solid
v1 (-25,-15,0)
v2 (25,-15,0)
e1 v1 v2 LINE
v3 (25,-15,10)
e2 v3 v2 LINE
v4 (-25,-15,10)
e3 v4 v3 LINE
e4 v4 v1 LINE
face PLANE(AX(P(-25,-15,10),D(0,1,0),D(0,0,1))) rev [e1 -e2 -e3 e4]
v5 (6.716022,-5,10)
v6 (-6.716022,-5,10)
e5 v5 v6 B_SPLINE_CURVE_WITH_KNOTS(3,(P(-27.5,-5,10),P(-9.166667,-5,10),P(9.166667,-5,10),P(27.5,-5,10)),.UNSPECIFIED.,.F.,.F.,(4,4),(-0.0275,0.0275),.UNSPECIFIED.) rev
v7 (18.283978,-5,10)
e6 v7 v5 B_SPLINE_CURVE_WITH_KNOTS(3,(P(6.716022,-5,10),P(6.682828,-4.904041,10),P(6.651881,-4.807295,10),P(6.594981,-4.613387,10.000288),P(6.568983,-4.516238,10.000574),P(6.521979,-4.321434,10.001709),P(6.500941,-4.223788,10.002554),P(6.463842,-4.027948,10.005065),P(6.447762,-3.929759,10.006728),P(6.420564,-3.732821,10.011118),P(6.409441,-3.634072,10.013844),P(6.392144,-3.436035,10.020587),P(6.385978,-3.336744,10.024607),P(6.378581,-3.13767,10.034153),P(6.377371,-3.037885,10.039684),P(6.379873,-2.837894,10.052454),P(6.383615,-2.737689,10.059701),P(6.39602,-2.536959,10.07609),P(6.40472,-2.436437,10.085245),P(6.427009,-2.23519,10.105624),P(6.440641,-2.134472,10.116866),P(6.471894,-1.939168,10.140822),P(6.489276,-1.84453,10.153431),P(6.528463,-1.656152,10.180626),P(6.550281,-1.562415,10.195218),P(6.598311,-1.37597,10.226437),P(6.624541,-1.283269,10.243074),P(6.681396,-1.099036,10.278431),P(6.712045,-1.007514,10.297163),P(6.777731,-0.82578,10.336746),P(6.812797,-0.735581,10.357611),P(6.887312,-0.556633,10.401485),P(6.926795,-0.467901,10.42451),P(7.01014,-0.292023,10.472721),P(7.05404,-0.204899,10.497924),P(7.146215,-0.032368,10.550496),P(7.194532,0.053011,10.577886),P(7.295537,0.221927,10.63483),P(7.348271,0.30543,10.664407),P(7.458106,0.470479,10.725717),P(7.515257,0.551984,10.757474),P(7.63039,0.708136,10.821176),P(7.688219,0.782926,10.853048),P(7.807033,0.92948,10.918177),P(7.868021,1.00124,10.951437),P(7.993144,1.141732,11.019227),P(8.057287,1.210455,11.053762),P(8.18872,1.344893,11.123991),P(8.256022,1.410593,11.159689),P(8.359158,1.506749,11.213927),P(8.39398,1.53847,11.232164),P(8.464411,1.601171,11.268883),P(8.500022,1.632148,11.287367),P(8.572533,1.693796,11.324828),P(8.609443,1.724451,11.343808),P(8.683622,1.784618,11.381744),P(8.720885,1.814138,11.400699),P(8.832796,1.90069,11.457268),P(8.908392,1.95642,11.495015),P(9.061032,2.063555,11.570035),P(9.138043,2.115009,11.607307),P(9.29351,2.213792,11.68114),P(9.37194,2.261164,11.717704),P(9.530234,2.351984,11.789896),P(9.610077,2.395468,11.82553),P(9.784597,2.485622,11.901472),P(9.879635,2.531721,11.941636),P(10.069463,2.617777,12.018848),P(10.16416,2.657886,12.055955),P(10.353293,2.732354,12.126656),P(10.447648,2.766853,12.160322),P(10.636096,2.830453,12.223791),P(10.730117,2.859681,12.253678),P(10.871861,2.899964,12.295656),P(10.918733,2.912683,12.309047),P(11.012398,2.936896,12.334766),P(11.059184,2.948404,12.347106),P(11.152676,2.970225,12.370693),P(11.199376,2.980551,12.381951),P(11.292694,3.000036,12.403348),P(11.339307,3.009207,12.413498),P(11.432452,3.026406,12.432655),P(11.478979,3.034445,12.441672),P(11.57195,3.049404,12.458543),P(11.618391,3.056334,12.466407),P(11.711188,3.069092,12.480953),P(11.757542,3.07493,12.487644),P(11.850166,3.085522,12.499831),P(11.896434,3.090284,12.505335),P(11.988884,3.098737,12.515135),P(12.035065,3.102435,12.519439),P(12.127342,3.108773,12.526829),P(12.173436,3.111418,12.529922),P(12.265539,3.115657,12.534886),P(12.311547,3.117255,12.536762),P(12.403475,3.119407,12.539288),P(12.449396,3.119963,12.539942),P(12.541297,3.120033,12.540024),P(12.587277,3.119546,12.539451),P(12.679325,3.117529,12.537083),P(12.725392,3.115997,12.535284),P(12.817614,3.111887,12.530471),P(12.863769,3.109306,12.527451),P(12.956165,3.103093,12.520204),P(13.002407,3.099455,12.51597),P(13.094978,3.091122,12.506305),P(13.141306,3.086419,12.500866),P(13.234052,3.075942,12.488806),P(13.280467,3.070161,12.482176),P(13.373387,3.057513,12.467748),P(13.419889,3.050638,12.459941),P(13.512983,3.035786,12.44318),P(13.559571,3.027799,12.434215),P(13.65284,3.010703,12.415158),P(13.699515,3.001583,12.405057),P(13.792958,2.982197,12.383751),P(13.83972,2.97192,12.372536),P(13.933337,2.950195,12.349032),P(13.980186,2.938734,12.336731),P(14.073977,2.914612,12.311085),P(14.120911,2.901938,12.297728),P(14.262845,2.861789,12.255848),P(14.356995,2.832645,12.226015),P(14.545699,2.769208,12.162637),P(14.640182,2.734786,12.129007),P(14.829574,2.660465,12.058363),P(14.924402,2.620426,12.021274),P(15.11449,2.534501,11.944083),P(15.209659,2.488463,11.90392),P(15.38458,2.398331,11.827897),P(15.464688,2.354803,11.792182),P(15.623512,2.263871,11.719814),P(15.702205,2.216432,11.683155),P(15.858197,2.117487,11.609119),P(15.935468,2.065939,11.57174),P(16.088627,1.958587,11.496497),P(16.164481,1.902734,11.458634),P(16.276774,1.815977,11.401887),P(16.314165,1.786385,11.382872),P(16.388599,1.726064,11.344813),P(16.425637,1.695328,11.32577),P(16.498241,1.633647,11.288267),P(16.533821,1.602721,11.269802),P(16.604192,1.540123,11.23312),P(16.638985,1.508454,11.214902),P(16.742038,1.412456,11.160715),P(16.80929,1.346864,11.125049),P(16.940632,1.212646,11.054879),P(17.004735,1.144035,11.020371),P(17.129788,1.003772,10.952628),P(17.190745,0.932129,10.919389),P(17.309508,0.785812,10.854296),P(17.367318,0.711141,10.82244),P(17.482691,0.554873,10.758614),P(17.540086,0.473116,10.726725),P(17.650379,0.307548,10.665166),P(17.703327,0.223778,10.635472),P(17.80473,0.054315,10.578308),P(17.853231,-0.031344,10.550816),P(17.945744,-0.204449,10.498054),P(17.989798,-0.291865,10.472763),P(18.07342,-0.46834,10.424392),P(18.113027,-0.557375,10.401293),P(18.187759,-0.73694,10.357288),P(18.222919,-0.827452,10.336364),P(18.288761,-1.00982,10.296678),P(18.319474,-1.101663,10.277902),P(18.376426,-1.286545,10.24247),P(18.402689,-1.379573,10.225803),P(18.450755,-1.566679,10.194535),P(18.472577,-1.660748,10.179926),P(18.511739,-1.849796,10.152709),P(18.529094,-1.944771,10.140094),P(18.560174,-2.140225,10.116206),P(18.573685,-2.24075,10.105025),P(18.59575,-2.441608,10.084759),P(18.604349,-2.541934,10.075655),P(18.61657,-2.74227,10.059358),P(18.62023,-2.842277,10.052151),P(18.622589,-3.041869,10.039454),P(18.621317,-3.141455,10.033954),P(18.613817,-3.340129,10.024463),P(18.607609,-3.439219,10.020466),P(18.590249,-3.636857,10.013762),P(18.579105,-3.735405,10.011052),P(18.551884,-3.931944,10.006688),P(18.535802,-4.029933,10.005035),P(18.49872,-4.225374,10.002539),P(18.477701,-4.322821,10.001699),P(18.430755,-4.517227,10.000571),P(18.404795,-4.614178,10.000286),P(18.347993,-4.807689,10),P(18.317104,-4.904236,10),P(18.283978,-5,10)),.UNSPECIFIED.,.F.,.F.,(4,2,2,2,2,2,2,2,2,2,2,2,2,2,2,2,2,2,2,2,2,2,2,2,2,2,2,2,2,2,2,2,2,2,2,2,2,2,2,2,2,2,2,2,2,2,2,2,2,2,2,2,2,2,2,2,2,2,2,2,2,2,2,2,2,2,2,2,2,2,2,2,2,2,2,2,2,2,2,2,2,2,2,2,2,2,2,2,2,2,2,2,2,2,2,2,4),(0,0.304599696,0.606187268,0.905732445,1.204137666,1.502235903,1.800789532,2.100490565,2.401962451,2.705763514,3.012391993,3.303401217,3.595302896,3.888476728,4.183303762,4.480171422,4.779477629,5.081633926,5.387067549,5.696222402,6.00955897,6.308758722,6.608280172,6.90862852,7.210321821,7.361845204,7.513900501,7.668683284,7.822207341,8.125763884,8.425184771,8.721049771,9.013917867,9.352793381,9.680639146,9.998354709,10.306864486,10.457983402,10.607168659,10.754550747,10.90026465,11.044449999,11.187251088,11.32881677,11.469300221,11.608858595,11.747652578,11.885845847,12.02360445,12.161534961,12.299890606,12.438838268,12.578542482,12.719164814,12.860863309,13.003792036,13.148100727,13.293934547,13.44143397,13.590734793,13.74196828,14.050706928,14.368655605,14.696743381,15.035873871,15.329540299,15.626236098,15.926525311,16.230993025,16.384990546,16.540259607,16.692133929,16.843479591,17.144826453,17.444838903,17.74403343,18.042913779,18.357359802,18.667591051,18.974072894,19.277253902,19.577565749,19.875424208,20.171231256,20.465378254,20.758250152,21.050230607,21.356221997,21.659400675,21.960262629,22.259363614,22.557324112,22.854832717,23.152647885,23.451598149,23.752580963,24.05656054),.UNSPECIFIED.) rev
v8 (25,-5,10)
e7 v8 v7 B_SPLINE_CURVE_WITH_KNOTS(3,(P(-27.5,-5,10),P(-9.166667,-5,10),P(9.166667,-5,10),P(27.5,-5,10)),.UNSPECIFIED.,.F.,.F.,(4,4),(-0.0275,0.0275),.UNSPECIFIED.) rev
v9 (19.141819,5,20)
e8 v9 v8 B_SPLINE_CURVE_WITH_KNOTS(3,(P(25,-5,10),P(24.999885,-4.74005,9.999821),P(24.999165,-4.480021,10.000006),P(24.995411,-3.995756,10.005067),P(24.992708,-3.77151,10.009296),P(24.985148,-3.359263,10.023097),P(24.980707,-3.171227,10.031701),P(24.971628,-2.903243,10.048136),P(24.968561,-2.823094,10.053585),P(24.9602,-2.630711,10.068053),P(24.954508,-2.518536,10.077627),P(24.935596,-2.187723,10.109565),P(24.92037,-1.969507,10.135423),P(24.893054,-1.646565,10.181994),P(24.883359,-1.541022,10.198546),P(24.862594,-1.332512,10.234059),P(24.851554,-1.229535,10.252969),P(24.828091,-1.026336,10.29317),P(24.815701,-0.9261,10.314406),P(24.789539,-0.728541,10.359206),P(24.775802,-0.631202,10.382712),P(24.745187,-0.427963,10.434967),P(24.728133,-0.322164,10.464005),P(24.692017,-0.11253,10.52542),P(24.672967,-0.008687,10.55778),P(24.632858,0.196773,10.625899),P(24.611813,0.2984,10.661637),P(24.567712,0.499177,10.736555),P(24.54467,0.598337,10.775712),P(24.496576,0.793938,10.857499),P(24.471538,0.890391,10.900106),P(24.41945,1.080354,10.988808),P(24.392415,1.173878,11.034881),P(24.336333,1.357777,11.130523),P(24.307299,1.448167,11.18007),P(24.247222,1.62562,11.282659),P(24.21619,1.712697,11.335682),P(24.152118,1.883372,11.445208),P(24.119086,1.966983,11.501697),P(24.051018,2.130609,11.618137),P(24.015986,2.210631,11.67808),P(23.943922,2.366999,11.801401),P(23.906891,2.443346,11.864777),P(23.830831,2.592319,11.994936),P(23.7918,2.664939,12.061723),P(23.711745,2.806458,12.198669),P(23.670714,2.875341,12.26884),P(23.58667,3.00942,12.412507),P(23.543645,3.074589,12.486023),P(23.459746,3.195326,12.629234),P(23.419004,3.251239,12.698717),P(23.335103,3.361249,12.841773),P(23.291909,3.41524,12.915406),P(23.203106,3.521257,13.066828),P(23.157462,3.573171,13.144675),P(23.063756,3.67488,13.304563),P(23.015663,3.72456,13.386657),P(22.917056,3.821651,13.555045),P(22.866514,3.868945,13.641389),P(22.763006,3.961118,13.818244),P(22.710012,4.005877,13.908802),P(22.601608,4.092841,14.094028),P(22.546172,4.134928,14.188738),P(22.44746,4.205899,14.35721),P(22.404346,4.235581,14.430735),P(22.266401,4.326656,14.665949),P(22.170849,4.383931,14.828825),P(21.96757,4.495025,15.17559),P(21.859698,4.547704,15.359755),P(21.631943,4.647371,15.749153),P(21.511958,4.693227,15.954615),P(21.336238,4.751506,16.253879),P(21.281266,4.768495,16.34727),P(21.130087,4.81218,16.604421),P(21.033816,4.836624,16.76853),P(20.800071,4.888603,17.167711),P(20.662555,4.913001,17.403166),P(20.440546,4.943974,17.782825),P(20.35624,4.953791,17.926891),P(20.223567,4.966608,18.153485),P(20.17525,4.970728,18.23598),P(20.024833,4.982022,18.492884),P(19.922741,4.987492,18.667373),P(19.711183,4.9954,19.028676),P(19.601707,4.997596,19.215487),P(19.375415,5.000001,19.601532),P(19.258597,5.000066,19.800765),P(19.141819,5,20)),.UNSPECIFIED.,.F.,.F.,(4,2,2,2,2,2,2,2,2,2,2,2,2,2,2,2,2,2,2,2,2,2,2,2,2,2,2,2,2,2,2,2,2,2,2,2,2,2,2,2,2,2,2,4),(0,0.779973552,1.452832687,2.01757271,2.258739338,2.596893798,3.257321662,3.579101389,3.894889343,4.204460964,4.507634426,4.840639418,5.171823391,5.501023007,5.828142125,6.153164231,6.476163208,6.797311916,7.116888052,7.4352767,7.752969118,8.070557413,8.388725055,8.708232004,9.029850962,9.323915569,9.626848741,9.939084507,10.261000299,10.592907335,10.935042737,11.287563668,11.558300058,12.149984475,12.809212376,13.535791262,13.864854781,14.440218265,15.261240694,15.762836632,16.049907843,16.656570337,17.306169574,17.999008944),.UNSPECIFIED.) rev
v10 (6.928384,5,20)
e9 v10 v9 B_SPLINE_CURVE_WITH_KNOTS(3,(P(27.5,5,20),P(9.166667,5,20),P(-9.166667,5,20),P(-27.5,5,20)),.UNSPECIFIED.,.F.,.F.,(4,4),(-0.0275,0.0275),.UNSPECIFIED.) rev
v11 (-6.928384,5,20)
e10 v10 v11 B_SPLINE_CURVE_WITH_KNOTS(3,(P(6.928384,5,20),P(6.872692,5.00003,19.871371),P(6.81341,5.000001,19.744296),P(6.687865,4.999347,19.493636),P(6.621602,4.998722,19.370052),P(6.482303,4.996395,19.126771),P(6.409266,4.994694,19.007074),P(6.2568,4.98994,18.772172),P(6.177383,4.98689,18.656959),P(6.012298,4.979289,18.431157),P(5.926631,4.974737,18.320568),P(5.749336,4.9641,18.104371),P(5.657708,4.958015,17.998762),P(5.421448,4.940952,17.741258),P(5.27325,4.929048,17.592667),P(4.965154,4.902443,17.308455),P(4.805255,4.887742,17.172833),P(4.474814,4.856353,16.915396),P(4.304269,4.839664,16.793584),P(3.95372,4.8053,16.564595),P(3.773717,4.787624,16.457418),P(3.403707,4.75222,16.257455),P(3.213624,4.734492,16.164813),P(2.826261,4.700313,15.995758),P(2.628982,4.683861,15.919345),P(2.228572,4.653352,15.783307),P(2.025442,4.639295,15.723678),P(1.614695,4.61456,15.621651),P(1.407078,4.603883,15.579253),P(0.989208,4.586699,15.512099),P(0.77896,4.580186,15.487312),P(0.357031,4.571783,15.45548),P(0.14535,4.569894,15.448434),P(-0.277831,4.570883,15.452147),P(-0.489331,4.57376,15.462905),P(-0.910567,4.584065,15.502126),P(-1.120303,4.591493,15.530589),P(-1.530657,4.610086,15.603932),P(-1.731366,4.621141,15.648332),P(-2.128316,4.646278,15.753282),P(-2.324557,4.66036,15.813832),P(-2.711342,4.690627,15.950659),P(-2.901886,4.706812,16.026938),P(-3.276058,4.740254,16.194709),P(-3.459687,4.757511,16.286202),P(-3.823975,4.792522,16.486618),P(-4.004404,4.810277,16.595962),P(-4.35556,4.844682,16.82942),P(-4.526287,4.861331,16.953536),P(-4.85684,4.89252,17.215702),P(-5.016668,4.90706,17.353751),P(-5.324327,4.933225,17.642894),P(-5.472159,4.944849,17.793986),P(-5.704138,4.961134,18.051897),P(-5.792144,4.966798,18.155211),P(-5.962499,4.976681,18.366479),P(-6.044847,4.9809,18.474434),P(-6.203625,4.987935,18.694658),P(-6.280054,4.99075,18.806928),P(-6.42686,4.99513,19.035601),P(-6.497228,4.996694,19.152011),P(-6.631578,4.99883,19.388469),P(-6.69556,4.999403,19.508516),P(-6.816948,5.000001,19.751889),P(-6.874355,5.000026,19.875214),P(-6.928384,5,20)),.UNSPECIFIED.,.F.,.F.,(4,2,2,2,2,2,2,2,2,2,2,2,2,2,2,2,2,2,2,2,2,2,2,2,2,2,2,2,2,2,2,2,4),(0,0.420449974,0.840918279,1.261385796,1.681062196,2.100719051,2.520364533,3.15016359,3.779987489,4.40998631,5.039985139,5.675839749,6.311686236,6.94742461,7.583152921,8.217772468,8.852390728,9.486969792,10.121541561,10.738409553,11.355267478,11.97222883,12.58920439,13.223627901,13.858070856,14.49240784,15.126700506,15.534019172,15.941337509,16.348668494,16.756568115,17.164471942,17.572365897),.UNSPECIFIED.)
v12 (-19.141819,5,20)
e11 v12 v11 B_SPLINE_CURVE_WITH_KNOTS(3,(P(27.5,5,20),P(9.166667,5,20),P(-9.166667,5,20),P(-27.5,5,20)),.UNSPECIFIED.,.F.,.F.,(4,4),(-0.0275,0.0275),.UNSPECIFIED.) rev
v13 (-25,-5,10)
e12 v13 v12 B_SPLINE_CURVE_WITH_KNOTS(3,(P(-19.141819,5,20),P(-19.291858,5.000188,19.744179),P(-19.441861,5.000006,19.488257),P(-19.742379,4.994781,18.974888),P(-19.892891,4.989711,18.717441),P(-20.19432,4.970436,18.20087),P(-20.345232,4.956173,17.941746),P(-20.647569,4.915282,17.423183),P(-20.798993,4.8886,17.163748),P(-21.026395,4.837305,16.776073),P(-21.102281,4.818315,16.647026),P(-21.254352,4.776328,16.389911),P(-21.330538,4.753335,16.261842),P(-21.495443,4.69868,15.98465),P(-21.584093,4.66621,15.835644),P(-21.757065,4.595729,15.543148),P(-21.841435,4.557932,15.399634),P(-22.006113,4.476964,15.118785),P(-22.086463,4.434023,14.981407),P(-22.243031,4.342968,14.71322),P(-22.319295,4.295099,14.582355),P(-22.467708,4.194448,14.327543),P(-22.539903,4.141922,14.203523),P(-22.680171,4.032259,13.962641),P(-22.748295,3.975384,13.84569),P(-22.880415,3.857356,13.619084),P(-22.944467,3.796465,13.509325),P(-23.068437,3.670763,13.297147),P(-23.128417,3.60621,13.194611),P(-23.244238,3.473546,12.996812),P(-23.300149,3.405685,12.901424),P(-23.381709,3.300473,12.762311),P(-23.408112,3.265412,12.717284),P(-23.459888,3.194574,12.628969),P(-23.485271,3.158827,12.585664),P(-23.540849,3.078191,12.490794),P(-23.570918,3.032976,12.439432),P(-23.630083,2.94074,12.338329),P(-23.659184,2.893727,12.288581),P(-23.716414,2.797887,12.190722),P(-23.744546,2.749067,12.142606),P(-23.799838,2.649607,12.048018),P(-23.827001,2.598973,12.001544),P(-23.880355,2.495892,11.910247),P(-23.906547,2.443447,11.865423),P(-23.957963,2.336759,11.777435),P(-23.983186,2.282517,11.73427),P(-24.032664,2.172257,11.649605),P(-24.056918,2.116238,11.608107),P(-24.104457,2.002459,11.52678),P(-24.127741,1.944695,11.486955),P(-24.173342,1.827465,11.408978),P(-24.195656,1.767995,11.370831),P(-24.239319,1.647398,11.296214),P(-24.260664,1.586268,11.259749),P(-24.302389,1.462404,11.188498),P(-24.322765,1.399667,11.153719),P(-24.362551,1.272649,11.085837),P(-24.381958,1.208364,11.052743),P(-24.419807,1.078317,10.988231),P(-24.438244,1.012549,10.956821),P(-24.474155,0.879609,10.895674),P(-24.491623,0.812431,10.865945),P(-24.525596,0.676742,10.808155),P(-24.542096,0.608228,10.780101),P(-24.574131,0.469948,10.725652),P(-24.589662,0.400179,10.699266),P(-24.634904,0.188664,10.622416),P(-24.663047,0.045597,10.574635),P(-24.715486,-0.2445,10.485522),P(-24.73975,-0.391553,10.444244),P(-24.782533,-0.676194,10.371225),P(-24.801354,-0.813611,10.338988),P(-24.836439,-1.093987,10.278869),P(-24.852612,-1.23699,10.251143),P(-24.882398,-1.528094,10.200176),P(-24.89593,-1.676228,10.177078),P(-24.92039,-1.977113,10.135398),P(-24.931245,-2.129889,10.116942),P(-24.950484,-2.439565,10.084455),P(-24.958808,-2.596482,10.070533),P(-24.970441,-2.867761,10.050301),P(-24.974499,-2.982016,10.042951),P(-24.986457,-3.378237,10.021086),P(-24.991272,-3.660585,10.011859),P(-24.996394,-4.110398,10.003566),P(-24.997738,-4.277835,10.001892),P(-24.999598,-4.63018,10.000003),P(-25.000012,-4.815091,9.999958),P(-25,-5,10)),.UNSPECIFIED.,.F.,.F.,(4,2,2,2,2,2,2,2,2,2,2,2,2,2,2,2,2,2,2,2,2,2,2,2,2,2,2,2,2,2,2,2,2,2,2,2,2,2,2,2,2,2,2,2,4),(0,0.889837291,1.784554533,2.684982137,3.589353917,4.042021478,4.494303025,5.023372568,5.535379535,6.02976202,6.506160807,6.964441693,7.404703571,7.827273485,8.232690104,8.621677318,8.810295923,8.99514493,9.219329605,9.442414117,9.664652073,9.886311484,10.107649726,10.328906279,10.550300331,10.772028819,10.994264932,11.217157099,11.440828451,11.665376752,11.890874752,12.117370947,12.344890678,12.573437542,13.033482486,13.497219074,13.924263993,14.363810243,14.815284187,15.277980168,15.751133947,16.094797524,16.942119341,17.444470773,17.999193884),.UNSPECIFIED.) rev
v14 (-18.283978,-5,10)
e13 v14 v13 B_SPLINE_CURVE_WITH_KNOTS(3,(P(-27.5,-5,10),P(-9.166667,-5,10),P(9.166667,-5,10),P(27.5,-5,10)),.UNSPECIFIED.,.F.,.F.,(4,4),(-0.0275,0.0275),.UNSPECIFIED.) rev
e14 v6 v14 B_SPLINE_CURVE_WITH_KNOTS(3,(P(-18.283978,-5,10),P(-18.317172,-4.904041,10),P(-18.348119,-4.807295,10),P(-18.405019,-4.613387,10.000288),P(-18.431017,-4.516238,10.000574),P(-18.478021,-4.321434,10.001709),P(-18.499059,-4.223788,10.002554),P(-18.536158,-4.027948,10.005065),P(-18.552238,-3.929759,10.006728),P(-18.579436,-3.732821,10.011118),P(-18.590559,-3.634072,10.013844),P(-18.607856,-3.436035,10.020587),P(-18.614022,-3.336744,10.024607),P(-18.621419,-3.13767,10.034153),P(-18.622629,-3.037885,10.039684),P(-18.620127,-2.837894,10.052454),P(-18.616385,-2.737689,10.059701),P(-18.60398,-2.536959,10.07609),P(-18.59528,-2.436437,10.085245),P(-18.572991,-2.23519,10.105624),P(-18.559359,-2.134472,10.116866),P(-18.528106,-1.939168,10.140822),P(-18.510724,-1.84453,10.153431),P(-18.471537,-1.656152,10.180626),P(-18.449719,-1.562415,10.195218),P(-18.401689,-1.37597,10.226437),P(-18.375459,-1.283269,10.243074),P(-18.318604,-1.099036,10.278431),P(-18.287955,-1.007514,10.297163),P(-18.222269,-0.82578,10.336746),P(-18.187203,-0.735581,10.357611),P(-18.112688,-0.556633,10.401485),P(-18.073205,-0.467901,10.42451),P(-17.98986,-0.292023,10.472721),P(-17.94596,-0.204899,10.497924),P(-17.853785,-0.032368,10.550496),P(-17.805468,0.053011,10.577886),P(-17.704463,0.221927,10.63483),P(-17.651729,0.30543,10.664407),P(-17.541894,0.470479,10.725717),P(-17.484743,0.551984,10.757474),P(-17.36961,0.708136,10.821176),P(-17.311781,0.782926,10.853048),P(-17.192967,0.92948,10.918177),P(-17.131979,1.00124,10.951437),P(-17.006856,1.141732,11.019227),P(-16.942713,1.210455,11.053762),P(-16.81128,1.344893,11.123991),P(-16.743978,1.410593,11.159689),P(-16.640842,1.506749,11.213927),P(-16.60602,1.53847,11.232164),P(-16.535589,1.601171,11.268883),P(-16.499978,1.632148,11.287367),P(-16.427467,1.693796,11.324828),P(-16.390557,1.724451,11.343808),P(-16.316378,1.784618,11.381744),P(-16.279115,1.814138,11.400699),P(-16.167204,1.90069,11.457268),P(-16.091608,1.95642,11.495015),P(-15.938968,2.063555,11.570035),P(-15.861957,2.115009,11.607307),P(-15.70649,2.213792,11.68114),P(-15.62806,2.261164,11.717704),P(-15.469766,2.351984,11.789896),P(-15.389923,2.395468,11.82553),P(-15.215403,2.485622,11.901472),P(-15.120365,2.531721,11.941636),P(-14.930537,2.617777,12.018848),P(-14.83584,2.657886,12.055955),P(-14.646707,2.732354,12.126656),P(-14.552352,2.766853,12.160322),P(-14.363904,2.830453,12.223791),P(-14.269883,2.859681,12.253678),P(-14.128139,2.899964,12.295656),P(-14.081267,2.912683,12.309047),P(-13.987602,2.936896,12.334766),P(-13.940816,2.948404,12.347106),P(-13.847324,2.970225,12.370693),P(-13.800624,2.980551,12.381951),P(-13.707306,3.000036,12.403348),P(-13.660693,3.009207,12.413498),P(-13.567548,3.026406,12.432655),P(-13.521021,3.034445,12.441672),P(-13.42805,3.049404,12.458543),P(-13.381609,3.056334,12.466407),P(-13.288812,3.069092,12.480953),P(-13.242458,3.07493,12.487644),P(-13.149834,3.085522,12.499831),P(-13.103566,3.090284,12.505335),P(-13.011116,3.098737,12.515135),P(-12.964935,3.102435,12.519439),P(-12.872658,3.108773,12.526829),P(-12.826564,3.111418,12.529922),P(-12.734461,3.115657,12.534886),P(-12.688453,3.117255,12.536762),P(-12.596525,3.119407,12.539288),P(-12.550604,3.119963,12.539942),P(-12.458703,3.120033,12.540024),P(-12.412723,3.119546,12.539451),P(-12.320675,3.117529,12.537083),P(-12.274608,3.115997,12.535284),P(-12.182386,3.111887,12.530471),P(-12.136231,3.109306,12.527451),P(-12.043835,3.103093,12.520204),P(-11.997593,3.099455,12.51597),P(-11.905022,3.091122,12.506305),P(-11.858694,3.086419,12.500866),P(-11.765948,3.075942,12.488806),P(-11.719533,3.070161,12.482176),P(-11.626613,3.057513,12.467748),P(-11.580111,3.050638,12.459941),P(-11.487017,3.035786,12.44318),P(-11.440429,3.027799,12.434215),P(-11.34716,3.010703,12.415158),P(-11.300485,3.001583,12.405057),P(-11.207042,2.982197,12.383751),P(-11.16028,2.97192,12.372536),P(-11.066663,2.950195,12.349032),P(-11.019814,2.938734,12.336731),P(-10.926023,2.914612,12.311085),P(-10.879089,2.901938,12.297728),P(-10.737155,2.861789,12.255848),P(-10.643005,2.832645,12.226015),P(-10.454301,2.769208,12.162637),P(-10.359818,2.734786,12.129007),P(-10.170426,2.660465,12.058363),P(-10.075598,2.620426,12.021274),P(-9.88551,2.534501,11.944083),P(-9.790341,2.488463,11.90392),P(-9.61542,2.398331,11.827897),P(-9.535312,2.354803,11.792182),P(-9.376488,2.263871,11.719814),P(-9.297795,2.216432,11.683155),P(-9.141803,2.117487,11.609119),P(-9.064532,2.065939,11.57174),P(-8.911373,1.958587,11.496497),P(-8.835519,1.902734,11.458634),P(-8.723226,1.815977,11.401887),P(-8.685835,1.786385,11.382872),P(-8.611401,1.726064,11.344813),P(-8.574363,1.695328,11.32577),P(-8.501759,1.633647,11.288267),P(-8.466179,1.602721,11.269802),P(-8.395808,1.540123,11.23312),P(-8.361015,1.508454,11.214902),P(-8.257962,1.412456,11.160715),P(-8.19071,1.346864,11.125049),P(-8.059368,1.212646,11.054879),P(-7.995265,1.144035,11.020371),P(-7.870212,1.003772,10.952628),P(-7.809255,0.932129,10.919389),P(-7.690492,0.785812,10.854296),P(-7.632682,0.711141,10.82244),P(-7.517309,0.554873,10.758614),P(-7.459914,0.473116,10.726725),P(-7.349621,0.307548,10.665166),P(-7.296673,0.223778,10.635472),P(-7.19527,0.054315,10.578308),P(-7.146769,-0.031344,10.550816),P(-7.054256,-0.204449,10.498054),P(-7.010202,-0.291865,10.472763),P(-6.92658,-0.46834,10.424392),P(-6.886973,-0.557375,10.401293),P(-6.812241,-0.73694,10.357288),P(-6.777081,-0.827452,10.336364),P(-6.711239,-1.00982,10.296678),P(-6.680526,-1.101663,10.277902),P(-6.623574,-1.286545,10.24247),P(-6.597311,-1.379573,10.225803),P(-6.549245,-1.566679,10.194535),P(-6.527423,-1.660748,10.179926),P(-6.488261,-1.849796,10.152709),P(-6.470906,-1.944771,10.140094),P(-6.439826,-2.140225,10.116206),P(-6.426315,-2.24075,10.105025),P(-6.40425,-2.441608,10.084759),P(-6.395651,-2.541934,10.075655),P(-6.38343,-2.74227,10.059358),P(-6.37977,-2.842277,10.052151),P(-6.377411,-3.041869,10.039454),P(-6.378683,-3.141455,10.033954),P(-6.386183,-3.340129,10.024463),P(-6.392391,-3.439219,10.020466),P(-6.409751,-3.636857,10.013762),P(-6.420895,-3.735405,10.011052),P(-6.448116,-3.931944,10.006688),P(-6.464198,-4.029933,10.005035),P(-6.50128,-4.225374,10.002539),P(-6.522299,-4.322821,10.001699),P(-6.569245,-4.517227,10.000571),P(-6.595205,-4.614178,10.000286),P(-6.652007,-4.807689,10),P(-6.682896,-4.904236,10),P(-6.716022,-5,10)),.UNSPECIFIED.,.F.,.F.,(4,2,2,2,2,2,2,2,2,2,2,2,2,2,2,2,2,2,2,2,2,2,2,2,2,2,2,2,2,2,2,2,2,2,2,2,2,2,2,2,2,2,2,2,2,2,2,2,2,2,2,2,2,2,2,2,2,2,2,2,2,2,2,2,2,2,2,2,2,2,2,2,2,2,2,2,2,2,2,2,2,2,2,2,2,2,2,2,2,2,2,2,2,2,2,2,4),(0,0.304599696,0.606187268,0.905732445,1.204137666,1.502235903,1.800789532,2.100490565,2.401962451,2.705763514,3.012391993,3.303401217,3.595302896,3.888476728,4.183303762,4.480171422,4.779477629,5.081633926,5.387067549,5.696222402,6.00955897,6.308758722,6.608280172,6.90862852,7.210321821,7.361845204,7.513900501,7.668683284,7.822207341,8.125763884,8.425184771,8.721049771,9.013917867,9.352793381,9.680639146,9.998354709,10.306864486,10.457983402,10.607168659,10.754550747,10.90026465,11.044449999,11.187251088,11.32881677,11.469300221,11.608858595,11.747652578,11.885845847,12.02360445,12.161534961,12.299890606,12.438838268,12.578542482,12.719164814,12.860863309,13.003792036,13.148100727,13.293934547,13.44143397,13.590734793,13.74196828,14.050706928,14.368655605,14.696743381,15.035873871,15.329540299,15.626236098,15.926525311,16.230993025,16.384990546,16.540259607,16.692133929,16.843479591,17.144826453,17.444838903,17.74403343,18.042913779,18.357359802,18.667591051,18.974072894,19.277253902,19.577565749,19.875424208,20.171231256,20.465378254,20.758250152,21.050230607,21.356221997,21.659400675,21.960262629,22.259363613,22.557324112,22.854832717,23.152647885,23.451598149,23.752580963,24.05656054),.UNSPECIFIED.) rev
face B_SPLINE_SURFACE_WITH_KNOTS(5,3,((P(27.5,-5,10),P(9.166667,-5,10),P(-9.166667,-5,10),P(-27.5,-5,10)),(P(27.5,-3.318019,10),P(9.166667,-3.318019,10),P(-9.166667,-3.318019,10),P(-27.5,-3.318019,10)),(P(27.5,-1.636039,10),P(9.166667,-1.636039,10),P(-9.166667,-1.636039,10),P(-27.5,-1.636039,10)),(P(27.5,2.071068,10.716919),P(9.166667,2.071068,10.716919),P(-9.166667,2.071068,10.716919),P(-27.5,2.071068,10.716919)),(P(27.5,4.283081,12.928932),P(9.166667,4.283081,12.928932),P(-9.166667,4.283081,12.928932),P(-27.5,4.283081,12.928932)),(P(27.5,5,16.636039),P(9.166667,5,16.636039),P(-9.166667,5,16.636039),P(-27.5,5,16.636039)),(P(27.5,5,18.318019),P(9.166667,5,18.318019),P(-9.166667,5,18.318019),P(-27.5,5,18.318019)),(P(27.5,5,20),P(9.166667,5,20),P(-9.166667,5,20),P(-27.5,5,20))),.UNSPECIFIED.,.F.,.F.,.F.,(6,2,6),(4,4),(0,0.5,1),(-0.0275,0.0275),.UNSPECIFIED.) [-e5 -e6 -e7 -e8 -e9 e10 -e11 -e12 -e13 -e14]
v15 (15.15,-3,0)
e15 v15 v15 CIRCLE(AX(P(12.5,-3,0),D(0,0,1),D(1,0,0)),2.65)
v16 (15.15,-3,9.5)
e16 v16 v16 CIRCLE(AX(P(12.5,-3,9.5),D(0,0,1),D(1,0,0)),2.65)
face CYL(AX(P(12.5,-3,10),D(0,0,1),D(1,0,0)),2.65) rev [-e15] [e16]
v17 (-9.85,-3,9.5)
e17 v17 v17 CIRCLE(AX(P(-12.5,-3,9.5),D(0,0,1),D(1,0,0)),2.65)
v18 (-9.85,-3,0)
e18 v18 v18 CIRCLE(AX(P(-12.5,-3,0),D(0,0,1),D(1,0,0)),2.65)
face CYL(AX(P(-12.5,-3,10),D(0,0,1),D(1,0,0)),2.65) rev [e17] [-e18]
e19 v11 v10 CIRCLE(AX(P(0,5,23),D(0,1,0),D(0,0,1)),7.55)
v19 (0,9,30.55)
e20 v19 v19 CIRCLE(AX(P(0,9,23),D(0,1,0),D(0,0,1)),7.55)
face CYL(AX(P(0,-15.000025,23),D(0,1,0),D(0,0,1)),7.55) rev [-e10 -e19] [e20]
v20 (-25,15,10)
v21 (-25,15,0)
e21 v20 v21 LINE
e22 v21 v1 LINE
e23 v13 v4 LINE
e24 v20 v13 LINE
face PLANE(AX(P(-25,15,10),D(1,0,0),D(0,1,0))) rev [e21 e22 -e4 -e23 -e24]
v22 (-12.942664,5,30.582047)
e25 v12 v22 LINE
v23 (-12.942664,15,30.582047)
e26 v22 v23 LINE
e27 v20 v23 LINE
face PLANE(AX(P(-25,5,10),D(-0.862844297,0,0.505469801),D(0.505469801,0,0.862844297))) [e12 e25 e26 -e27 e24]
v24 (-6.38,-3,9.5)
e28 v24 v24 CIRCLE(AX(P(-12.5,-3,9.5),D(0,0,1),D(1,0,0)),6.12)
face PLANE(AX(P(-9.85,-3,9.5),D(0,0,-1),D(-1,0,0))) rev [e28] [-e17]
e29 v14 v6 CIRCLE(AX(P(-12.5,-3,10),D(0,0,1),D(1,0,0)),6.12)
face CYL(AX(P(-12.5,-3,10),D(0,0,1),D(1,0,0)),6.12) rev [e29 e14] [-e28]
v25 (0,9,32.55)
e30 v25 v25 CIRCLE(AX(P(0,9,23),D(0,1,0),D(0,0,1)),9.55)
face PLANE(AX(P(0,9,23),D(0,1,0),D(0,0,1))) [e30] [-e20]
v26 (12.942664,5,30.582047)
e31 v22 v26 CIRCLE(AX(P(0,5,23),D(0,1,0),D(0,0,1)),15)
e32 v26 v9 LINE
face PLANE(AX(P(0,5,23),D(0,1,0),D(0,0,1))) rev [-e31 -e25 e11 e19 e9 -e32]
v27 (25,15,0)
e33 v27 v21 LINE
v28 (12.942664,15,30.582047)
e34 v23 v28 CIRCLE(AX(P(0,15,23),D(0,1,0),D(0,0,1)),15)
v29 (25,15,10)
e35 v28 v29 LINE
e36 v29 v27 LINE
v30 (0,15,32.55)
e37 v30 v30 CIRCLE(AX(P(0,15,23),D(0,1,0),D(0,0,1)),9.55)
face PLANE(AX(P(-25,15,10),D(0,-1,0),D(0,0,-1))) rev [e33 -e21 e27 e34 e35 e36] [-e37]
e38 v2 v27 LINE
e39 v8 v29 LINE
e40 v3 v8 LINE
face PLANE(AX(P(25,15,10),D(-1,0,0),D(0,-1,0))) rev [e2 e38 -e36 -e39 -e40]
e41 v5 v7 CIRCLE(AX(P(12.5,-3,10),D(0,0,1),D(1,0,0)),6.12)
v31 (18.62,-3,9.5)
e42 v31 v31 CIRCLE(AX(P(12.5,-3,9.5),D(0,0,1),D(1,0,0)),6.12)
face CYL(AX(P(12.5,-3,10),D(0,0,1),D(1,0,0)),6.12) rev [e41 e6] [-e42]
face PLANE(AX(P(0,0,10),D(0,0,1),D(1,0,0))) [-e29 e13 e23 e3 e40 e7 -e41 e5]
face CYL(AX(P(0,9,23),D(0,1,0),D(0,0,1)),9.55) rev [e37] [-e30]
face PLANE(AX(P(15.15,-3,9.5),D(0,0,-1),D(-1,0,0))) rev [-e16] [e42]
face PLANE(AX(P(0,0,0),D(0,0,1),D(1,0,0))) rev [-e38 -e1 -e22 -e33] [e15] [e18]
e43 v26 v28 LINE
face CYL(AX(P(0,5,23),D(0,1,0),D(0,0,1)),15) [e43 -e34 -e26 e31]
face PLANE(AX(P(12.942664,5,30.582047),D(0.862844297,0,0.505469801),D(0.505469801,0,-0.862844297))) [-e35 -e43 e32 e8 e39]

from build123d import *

# Parameters (mm, degrees)
SKETCH1_W                               = 50
SKETCH1_H                               = 30
BOSS_EXTRUDE1_DEPTH                     = 10
BOSS_EXTRUDE3_DEPTH                     = 10
CBORE_FOR_M5_HEX_HEAD_BOLT1_D           = 5.3
CBORE_FOR_M5_HEX_HEAD_BOLT1_CBORE_D     = 12.24
CBORE_FOR_M5_HEX_HEAD_BOLT1_CBORE_DEPTH = 0.5
FILLET1_SIZE                            = 10
SKETCH15_R                              = 9.55
CUT_EXTRUDE1_DEPTH                      = 6
SKETCH16_R                              = 7.55
CUT_EXTRUDE2_DEPTH                      = 52.429563531


with BuildPart() as part:
    # Sketch1 → Boss-Extrude1 (new body)
    with BuildSketch(Plane.XY):
        Rectangle(SKETCH1_W, SKETCH1_H)
    extrude(amount=BOSS_EXTRUDE1_DEPTH)

    # Sketch8 → Boss-Extrude3 (add)
    with BuildSketch(Plane(origin=(0, 15, 0), x_dir=(1, 0, 0), z_dir=(0, 1, 0))):
        with BuildLine():
            Line((-25, -10), (-12.942664449, -30.582047017))
            ThreePointArc((-12.942664449, -30.582047017), (0, -38), (12.942664449, -30.582047017))
            Line((12.942664449, -30.582047017), (25, -10))
            Line((25, -10), (-25, -10))
        make_face()
    extrude(amount=-BOSS_EXTRUDE3_DEPTH)

    # CBORE for M5 Hex Head Bolt1 (through all)
    with Locations(Plane.XY.offset(10)):
        with Locations((12.5, -3), (-12.5, -3)):
            CounterBoreHole(CBORE_FOR_M5_HEX_HEAD_BOLT1_D / 2, CBORE_FOR_M5_HEX_HEAD_BOLT1_CBORE_D / 2, CBORE_FOR_M5_HEX_HEAD_BOLT1_CBORE_DEPTH)

    # Fillet1
    # a fillet whose section is not a circle: 10 mm, written as the material it adds along each edge
    with BuildSketch(Plane(origin=(50, 5, 10), x_dir=(0, -1, 0), z_dir=(-1, 0, 0))) as fillet1_piece_1_section:
        with BuildLine():
            add(Edge.make_bspline([(FILLET1_SIZE, 0), (FILLET1_SIZE * 0.831801948466, 0), (FILLET1_SIZE * 0.663603896932, 0), (FILLET1_SIZE * 0.292893218813, FILLET1_SIZE * 0.0716919198361), (FILLET1_SIZE * 0.0716919198361, FILLET1_SIZE * 0.292893218813), (0, FILLET1_SIZE * 0.663603896932), (0, FILLET1_SIZE * 0.831801948466), (0, FILLET1_SIZE)], knots=[0, 0, 0, 0, 0, 0, 0.5, 0.5, 1, 1, 1, 1, 1, 1], degree=5))
            Line((0, FILLET1_SIZE), (0, 0))
            Line((0, 0), (FILLET1_SIZE, 0))
        make_face()
    fillet1_piece_1 = extrude(amount=100, mode=Mode.PRIVATE)
    fillet1_piece_1 = split(fillet1_piece_1, bisect_by=Plane(origin=(-5.837521011, 5, 42.710630125), z_dir=(0.8628442965853785, 0, -0.5054698011257285)), keep=Keep.TOP, mode=Mode.PRIVATE)
    fillet1_piece_1 = split(fillet1_piece_1, bisect_by=Plane(origin=(31.387492996, 5, -0.903543375), z_dir=(-0.8628442965853789, 0, -0.5054698011257279)), keep=Keep.TOP, mode=Mode.PRIVATE)
    fillet1_piece_1 = fillet1_piece_1 - Plane(origin=(12.5, -3, 10), x_dir=(1, 0, 0), z_dir=(0, 0, 1)) * Cylinder(6.12, 240, mode=Mode.PRIVATE)
    fillet1_piece_1 = fillet1_piece_1 - Plane(origin=(-12.5, -3, 10), x_dir=(1, 0, 0), z_dir=(0, 0, 1)) * Cylinder(6.12, 240, mode=Mode.PRIVATE)
    add(fillet1_piece_1)

    # Sketch15 → Cut-Extrude1 (cut)
    with BuildSketch(Plane(origin=(0, 15, 0), x_dir=(1, 0, 0), z_dir=(0, 1, 0))):
        with Locations(Location((0, -23, 0), (0, 0, 270))):
            Circle(SKETCH15_R)
    extrude(amount=-CUT_EXTRUDE1_DEPTH, mode=Mode.SUBTRACT)

    # Sketch16 → Cut-Extrude2 (cut, through all)
    with BuildSketch(Plane(origin=(0, 9, 0), x_dir=(1, 0, 0), z_dir=(0, 1, 0))):
        with Locations(Location((0, -23, 0), (0, 0, 270))):
            Circle(SKETCH16_R)
    extrude(amount=-CUT_EXTRUDE2_DEPTH, mode=Mode.SUBTRACT)


solid = part.part
